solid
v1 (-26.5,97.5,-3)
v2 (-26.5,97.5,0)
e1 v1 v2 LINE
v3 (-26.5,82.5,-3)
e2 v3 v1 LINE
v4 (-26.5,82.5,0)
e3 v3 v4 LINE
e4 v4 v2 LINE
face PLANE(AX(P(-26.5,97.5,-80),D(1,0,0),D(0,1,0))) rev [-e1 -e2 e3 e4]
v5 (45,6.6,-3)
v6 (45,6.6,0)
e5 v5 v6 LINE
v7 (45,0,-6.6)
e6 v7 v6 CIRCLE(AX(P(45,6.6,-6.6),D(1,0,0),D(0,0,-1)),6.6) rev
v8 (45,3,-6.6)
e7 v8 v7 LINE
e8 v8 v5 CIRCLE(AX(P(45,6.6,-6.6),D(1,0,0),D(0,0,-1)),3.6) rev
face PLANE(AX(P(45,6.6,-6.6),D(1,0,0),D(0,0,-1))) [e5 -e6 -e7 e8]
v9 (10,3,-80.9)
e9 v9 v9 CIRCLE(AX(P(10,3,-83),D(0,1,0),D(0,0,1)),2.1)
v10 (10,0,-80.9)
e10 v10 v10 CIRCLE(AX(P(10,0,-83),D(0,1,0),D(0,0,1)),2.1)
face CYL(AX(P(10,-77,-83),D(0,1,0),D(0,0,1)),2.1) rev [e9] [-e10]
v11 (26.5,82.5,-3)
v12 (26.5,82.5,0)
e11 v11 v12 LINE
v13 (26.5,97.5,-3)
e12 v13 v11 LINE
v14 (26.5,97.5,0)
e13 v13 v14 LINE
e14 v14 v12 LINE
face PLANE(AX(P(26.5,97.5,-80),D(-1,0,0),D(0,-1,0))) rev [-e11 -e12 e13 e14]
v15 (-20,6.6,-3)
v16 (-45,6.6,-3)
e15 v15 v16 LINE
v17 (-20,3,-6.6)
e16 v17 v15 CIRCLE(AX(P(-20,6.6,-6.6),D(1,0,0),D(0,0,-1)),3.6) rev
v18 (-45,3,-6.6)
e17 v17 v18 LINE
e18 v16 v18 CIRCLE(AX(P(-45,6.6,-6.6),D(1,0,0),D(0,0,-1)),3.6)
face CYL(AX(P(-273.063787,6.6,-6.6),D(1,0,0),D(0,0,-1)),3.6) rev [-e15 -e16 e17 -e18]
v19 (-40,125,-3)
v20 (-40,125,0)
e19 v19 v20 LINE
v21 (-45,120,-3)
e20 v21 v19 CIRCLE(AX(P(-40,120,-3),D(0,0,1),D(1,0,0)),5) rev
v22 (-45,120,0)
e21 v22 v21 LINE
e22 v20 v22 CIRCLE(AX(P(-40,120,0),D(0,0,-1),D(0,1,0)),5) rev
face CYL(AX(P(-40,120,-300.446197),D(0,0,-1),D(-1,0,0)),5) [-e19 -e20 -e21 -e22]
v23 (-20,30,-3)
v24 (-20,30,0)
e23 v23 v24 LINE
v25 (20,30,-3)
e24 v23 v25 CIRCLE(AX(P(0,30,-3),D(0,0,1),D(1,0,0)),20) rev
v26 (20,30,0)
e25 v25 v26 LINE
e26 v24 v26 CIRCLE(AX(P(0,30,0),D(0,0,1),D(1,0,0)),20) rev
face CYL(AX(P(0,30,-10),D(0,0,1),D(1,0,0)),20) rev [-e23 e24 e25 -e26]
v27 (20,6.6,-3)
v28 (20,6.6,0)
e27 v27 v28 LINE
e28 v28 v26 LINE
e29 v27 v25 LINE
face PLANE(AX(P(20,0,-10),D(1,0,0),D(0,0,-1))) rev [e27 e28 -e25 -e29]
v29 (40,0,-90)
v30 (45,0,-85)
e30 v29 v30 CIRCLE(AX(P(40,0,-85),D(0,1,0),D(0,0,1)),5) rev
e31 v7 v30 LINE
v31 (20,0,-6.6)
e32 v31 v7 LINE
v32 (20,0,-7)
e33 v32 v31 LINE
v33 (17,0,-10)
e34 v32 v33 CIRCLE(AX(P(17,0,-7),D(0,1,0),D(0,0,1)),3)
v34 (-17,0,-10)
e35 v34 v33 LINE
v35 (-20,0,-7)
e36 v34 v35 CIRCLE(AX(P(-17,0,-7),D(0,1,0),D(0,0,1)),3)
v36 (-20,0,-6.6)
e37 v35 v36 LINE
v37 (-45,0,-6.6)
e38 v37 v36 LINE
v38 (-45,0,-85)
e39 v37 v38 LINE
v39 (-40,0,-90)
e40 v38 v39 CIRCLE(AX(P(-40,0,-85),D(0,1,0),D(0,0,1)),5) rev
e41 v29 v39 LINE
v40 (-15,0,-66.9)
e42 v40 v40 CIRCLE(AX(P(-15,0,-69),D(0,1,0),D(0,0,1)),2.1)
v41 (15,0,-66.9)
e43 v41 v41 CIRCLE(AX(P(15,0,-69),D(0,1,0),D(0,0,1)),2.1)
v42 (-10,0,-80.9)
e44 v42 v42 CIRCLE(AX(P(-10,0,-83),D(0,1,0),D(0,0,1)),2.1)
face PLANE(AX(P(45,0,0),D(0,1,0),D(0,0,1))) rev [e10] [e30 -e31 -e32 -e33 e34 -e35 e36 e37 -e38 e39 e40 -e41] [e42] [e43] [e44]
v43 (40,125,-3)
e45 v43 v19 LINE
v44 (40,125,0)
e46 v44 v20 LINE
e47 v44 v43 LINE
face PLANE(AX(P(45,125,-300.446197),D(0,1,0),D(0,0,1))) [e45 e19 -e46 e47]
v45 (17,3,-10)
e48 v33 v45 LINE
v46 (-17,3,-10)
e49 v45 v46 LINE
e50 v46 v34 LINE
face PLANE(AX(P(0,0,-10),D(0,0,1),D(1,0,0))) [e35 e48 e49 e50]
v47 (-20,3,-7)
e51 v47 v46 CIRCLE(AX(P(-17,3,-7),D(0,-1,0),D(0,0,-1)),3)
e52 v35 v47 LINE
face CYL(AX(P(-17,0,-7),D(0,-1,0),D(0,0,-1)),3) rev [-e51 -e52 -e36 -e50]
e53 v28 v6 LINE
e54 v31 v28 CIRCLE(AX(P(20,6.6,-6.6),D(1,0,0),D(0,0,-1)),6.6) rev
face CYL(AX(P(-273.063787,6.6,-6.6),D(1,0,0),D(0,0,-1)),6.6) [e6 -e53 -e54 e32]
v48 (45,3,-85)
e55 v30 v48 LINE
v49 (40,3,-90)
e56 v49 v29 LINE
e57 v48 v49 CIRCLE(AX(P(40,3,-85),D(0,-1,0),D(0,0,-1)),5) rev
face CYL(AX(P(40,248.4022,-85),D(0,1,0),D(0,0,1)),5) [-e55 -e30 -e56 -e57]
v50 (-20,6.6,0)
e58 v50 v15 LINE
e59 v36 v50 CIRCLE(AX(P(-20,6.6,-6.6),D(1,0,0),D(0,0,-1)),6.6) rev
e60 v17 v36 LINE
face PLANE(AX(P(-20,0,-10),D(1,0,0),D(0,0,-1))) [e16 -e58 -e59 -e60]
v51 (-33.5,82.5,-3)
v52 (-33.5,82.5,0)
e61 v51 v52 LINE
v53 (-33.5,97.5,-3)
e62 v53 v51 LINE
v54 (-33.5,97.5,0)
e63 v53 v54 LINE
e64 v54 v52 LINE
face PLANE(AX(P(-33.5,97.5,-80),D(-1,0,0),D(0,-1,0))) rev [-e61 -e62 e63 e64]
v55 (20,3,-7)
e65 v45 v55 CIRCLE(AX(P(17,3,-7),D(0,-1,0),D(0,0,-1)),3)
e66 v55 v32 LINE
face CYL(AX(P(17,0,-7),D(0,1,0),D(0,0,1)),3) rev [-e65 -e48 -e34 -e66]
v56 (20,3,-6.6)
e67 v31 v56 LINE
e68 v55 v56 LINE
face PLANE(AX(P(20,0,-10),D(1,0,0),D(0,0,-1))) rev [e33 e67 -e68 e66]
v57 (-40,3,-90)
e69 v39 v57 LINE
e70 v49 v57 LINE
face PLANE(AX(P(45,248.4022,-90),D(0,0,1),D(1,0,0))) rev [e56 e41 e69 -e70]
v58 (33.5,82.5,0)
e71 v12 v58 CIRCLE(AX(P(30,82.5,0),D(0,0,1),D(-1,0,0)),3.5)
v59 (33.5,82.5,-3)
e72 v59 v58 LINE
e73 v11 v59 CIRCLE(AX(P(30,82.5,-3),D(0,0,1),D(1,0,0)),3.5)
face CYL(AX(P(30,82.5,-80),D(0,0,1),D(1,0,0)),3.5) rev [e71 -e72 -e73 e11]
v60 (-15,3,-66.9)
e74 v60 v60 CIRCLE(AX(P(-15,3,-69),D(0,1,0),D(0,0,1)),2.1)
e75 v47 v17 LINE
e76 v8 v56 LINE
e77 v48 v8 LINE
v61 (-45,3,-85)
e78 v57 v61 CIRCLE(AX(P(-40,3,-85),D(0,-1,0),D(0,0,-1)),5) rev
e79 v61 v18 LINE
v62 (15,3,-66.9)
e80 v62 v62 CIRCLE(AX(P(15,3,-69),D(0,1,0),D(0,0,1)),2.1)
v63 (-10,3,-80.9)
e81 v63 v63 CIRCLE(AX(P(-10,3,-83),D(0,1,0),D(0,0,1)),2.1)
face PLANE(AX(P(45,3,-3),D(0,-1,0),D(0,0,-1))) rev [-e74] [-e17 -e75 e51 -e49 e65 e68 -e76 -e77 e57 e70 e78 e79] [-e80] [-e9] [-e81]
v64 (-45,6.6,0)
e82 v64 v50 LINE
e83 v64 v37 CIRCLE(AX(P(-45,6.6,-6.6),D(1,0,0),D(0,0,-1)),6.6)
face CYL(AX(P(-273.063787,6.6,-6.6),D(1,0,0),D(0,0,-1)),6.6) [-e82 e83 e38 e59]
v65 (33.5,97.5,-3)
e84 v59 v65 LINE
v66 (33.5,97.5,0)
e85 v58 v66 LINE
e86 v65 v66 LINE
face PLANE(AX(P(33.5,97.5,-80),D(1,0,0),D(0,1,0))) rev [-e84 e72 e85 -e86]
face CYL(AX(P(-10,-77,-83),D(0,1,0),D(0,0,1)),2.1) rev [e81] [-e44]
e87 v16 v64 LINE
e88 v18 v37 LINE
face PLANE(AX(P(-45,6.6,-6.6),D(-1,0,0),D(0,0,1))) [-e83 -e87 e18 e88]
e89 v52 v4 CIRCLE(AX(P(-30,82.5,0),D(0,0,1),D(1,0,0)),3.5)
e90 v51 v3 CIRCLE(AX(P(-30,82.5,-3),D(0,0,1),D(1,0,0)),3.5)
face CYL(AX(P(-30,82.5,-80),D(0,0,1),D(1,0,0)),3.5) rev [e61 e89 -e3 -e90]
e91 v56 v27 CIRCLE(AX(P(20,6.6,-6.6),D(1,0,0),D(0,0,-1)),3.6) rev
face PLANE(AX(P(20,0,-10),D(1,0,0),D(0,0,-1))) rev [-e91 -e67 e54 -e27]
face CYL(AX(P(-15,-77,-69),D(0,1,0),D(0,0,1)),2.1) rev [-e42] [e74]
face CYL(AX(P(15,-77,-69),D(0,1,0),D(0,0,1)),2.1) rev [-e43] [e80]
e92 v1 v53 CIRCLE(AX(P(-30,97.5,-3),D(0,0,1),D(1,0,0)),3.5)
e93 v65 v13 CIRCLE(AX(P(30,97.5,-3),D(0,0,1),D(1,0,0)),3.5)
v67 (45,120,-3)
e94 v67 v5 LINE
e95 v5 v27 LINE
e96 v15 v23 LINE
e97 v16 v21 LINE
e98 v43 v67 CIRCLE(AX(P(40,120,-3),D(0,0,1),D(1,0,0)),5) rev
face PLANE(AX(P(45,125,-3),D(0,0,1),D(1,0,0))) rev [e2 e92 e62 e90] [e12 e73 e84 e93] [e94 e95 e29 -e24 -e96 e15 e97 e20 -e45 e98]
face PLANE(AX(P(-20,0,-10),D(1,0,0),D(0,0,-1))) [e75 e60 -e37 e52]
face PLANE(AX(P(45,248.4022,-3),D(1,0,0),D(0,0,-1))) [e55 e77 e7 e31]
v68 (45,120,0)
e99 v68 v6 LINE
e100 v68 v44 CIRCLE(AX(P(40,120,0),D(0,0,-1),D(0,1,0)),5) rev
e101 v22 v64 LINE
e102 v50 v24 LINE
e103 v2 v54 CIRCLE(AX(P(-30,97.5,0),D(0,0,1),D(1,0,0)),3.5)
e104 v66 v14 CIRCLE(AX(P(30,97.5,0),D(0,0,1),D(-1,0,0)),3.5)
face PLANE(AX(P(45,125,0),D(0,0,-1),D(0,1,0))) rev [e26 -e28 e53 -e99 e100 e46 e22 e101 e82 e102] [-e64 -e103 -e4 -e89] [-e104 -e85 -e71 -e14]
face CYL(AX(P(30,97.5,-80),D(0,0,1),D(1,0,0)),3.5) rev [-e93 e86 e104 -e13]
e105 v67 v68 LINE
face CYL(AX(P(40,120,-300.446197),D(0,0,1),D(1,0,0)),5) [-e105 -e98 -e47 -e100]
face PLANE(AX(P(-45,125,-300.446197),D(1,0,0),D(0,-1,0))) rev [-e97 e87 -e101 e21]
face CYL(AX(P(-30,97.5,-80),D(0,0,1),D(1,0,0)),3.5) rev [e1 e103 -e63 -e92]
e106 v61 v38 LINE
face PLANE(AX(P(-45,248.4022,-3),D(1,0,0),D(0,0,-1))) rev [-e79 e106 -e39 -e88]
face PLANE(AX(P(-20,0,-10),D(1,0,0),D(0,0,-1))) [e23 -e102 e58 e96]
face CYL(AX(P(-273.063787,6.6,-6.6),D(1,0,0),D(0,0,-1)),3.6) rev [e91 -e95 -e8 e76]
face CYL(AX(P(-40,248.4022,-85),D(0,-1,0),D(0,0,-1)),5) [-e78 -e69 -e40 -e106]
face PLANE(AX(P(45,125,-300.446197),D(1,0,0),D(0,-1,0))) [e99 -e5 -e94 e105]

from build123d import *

# Parameters (mm, degrees)
BOSS_EXTRUDE1_DEPTH        = 45
FLATTEN_BENDS1_START       = -45
FLATTEN_BENDS1_OUTLINE_W   = 122
FLATTEN_BENDS1_OUTLINE_H   = 3
FLATTEN_BENDS1_DEPTH       = 90
FLATTEN_BENDS1_2_OUTLINE_W = 3
FLATTEN_BENDS1_2_OUTLINE_H = 119.533030317
FLATTEN_BENDS1_2_DEPTH     = 90
PROCESS_BENDS1_START       = -45
PROCESS_BENDS1_DEPTH       = 90
PROCESS_BENDS1_2_DEPTH     = 90
SKETCH8_W                  = 40
SKETCH8_H                  = 6.6
SKETCH8_H_2                = 23.4
CUT_EXTRUDE1_DEPTH         = 10
FILLET1_R                  = 3
FILLET2_R                  = 5
CUT_EXTRUDE2_DEPTH         = 80
SKETCH10_R                 = 2.1
CUT_EXTRUDE3_DEPTH         = 80


# Read off the part's stored shape, not the designer's step: Flatten-Bends1, Process-Bends1
with BuildPart() as part:
    # Sketch1 → Boss-Extrude1 (new, symmetric)
    with BuildSketch(Plane(origin=(0, 0, 0), x_dir=(0, 0, -1), z_dir=(1, 0, 0))):
        Polygon((0, 125), (0, 0), (90, 0), (90, 3), (3, 3), (3, 125), align=None)
    extrude(amount=BOSS_EXTRUDE1_DEPTH, both=True)

    # Flatten-Bends1 outline → Flatten-Bends1 (cut)
    with BuildSketch(Plane.YZ.offset(FLATTEN_BENDS1_START)):
        with Locations((64, -1.5)):
            Rectangle(FLATTEN_BENDS1_OUTLINE_W, FLATTEN_BENDS1_OUTLINE_H)
    extrude(amount=FLATTEN_BENDS1_DEPTH, mode=Mode.SUBTRACT)

    # Flatten-Bends1 2 outline → Flatten-Bends1 2 (add)
    with BuildSketch(Plane.YZ.offset(FLATTEN_BENDS1_START)):
        with Locations((1.5, 59.766515159)):
            Rectangle(FLATTEN_BENDS1_2_OUTLINE_W, FLATTEN_BENDS1_2_OUTLINE_H)
    extrude(amount=FLATTEN_BENDS1_2_DEPTH)

    # Process-Bends1 outline → Process-Bends1 (cut)
    with BuildSketch(Plane.YZ.offset(PROCESS_BENDS1_START)):
        with BuildLine():
            ThreePointArc((0, -6.6), (0.798276118, -3.453573455), (3, -1.068273325))
            Line((3, -1.068273325), (3, 119.533030317))
            Line((3, 119.533030317), (0, 119.533030317))
            Line((0, 119.533030317), (0, -6.6))
        make_face()
    extrude(amount=PROCESS_BENDS1_DEPTH, mode=Mode.SUBTRACT)

    # Process-Bends1 2 outline → Process-Bends1 2 (add)
    with BuildSketch(Plane.YZ.offset(PROCESS_BENDS1_START)):
        with BuildLine():
            Line((6.6, -3), (125, -3))
            Line((125, -3), (125, 0))
            Line((125, 0), (6.6, 0))
            ThreePointArc((6.6, 0), (4.722421247, -0.272702154), (3, -1.068273325))
            Line((3, -1.068273325), (3, -6.6))
            ThreePointArc((3, -6.6), (4.054415588, -4.054415588), (6.6, -3))
        make_face()
    extrude(amount=PROCESS_BENDS1_2_DEPTH)

    # Sketch8 → Cut-Extrude1 (cut)
    with BuildSketch(Plane.XY):
        with BuildLine():
            ThreePointArc((-20, 30), (0, 50), (20, 30))
            Line((20, 30), (-20, 30))
        make_face()
        with Locations((0, 3.3)):
            Rectangle(SKETCH8_W, SKETCH8_H)
        with Locations((0, 18.3)):
            Rectangle(SKETCH8_W, SKETCH8_H_2)
    extrude(amount=-CUT_EXTRUDE1_DEPTH, mode=Mode.SUBTRACT)

    # Fillet1
    fillet1_edges = [part.edges().sort_by_distance(p)[0] for p in [
        (-20, 1.5, -10),
        (20, 1.5, -10),
    ]]
    fillet(fillet1_edges, radius=FILLET1_R)

    # Fillet2
    fillet2_edges = [part.edges().sort_by_distance(p)[0] for p in [
        (-45, 125, -1.5),
        (45, 125, -1.5),
        (45, 1.5, -90),
        (-45, 1.5, -90),
    ]]
    fillet(fillet2_edges, radius=FILLET2_R)

    # Sketch9 → Cut-Extrude2 (cut)
    with BuildSketch(Plane.XY):
        with BuildLine():
            Line((-26.5, 97.5), (-26.5, 82.5))
            ThreePointArc((-26.5, 82.5), (-30, 79), (-33.5, 82.5))
            Line((-33.5, 82.5), (-33.5, 97.5))
            ThreePointArc((-33.5, 97.5), (-30, 101), (-26.5, 97.5))
        make_face()
        with BuildLine():
            Line((26.5, 97.5), (26.5, 82.5))
            ThreePointArc((26.5, 82.5), (30, 79), (33.5, 82.5))
            Line((33.5, 82.5), (33.5, 97.5))
            ThreePointArc((33.5, 97.5), (30, 101), (26.5, 97.5))
        make_face()
    extrude(amount=-CUT_EXTRUDE2_DEPTH, mode=Mode.SUBTRACT)

    # Sketch10 → Cut-Extrude3 (cut)
    with BuildSketch(Plane(origin=(0, 3, 0), x_dir=(1, 0, 0), z_dir=(0, 1, 0))):
        with Locations(Location((-10, 83, 0), (0, 0, 270))):
            Circle(SKETCH10_R)
        with Locations(Location((10, 83, 0), (0, 0, 270))):
            Circle(SKETCH10_R)
        with Locations(Location((-15, 69, 0), (0, 0, 270))):
            Circle(SKETCH10_R)
        with Locations(Location((15, 69, 0), (0, 0, 270))):
            Circle(SKETCH10_R)
    extrude(amount=-CUT_EXTRUDE3_DEPTH, mode=Mode.SUBTRACT)


solid = part.part
